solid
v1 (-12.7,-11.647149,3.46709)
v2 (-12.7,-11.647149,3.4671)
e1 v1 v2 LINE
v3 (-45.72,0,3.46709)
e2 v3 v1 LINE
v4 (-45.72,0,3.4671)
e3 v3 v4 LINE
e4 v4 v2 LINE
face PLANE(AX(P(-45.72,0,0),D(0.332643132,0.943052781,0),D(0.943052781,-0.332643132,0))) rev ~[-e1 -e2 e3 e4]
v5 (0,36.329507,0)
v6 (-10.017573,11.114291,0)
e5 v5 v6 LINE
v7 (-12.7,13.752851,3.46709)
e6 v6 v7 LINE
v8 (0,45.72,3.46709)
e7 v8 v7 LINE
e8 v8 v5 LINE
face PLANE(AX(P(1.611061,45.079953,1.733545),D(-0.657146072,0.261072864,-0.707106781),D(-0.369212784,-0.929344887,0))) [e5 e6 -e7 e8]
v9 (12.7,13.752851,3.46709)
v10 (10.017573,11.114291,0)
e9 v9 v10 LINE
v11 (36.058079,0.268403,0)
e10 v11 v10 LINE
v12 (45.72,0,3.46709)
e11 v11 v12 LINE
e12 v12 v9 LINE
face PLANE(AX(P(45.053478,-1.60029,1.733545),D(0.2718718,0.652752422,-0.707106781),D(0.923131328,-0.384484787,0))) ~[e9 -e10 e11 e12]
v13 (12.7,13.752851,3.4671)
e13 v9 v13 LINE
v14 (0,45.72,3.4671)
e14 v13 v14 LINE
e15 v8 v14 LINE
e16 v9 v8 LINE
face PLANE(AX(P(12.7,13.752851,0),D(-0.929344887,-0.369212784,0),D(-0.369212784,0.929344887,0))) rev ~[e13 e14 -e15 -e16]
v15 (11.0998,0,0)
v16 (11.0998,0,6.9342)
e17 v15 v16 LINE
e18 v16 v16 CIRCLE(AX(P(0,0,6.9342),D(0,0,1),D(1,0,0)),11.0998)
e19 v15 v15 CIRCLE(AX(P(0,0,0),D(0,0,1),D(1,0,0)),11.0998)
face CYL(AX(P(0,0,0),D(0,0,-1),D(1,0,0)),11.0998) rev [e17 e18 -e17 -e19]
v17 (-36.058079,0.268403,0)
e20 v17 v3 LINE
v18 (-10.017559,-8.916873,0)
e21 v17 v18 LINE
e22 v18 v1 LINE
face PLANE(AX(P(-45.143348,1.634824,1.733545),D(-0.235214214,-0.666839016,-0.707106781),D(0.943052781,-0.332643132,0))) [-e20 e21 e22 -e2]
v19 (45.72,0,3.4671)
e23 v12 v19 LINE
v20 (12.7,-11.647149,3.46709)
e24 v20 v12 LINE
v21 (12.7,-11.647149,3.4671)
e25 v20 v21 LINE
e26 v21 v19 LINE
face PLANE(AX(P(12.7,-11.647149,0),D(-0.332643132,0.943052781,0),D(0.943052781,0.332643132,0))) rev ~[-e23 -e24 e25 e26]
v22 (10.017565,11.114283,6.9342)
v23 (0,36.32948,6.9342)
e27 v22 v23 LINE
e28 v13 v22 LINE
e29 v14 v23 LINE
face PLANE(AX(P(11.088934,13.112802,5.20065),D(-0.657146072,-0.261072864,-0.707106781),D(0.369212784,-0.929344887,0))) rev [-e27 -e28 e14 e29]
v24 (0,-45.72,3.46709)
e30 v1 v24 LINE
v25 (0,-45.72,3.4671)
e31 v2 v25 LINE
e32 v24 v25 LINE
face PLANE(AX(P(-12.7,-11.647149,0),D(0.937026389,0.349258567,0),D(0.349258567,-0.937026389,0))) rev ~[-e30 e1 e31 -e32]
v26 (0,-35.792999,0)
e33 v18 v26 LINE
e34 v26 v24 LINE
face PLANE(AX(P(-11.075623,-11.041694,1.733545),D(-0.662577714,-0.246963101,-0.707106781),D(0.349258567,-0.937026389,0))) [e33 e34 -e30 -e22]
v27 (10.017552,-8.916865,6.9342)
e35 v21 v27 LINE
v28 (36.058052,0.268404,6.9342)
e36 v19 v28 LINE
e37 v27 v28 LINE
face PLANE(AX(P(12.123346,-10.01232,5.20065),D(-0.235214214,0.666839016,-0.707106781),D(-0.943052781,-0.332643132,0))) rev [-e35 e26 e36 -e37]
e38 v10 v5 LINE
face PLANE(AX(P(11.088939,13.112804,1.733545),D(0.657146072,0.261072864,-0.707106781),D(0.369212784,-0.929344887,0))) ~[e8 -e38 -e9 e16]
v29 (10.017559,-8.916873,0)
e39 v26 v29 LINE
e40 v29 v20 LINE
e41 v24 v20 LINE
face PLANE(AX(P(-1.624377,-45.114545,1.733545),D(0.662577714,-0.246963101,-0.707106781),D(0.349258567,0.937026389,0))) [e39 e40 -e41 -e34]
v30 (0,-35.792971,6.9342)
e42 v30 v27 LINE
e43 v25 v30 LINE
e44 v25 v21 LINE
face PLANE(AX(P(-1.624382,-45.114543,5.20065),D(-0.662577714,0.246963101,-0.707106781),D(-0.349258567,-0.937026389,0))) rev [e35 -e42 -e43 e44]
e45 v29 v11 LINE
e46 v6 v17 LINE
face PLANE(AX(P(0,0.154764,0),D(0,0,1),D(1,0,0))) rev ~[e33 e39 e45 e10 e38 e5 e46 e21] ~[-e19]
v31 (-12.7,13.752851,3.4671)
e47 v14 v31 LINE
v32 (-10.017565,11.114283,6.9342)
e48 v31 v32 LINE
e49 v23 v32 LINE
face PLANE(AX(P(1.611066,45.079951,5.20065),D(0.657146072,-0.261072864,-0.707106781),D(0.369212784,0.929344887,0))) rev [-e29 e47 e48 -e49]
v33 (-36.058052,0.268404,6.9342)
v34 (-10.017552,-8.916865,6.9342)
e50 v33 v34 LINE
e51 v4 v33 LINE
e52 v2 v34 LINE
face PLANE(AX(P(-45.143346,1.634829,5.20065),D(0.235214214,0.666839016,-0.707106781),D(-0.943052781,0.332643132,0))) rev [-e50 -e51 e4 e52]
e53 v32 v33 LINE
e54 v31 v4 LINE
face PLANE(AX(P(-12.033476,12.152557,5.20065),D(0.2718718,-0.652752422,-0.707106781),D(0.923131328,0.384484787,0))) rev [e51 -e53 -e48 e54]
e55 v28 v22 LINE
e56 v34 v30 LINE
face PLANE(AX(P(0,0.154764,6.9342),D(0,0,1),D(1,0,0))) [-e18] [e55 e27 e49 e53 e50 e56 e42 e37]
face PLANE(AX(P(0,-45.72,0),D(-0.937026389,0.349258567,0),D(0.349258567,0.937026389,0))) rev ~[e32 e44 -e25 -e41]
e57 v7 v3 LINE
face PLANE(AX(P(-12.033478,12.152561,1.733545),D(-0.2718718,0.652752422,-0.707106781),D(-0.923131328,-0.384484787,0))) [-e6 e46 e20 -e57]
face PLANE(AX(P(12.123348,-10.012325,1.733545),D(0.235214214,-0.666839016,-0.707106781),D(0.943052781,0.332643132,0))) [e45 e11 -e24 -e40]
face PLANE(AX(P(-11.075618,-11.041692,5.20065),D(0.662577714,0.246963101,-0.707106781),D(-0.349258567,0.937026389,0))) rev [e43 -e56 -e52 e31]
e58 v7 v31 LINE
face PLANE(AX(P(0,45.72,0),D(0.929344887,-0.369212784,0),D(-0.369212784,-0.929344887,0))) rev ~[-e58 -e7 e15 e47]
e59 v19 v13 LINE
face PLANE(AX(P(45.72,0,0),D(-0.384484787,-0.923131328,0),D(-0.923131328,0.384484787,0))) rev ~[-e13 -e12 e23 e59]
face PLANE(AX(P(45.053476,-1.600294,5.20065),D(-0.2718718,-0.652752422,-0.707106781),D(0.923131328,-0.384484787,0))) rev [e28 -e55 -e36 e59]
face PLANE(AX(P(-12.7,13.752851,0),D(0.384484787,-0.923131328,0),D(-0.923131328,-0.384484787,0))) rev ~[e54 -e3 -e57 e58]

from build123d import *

# Parameters (mm, degrees)
F0_R     = 11.0998
F1_DEPTH = 6.9342
F2_SIZE  = 3.4671
F3_SIZE  = 3.46709


# Not quite as in the source:
# - a fillet or chamfer is up to 0.001 mm smaller than in the source, because OpenCascade refuses the exact size


with BuildPart() as f1:
    # F0 (on Top) → F1 (new body)
    with BuildSketch(Plane.XY):
        Polygon((12.7, 13.7528510513), (0, 45.72), (-12.7, 13.7528510513), (-45.72, 0), (-12.7, -11.6471489487), (0, -45.72), (12.7, -11.6471489487), (45.72, 0), align=None)
        Circle(F0_R, mode=Mode.SUBTRACT)
    extrude(amount=F1_DEPTH)

    # F2
    f2_edges = [f1.edges().sort_by_distance(p)[0] for p in [
        (6.35, -28.683574, 6.9342),
        (29.21, -5.823574, 6.9342),
        (-29.21, -5.823574, 6.9342),
        (-6.35, 29.736426, 6.9342),
        (-29.21, 6.876426, 6.9342),
        (6.35, 29.736426, 6.9342),
        (29.21, 6.876426, 6.9342),
        (-6.35, -28.683574, 6.9342),
    ]]
    chamfer(f2_edges, length=F2_SIZE)

    # F3 (size 3.4671 in the source; OpenCascade refuses exactly that, so slightly less here)
    f3_edges = [f1.edges().sort_by_distance(p)[0] for p in [
        (6.35, -28.683574, 0),
        (29.21, -5.823574, 0),
        (-29.21, -5.823574, 0),
        (-6.35, -28.683574, 0),
        (6.35, 29.736426, 0),
        (29.21, 6.876426, 0),
        (-29.21, 6.876426, 0),
        (-6.35, 29.736426, 0),
    ]]
    chamfer(f3_edges, length=F3_SIZE)


solid = f1.part
